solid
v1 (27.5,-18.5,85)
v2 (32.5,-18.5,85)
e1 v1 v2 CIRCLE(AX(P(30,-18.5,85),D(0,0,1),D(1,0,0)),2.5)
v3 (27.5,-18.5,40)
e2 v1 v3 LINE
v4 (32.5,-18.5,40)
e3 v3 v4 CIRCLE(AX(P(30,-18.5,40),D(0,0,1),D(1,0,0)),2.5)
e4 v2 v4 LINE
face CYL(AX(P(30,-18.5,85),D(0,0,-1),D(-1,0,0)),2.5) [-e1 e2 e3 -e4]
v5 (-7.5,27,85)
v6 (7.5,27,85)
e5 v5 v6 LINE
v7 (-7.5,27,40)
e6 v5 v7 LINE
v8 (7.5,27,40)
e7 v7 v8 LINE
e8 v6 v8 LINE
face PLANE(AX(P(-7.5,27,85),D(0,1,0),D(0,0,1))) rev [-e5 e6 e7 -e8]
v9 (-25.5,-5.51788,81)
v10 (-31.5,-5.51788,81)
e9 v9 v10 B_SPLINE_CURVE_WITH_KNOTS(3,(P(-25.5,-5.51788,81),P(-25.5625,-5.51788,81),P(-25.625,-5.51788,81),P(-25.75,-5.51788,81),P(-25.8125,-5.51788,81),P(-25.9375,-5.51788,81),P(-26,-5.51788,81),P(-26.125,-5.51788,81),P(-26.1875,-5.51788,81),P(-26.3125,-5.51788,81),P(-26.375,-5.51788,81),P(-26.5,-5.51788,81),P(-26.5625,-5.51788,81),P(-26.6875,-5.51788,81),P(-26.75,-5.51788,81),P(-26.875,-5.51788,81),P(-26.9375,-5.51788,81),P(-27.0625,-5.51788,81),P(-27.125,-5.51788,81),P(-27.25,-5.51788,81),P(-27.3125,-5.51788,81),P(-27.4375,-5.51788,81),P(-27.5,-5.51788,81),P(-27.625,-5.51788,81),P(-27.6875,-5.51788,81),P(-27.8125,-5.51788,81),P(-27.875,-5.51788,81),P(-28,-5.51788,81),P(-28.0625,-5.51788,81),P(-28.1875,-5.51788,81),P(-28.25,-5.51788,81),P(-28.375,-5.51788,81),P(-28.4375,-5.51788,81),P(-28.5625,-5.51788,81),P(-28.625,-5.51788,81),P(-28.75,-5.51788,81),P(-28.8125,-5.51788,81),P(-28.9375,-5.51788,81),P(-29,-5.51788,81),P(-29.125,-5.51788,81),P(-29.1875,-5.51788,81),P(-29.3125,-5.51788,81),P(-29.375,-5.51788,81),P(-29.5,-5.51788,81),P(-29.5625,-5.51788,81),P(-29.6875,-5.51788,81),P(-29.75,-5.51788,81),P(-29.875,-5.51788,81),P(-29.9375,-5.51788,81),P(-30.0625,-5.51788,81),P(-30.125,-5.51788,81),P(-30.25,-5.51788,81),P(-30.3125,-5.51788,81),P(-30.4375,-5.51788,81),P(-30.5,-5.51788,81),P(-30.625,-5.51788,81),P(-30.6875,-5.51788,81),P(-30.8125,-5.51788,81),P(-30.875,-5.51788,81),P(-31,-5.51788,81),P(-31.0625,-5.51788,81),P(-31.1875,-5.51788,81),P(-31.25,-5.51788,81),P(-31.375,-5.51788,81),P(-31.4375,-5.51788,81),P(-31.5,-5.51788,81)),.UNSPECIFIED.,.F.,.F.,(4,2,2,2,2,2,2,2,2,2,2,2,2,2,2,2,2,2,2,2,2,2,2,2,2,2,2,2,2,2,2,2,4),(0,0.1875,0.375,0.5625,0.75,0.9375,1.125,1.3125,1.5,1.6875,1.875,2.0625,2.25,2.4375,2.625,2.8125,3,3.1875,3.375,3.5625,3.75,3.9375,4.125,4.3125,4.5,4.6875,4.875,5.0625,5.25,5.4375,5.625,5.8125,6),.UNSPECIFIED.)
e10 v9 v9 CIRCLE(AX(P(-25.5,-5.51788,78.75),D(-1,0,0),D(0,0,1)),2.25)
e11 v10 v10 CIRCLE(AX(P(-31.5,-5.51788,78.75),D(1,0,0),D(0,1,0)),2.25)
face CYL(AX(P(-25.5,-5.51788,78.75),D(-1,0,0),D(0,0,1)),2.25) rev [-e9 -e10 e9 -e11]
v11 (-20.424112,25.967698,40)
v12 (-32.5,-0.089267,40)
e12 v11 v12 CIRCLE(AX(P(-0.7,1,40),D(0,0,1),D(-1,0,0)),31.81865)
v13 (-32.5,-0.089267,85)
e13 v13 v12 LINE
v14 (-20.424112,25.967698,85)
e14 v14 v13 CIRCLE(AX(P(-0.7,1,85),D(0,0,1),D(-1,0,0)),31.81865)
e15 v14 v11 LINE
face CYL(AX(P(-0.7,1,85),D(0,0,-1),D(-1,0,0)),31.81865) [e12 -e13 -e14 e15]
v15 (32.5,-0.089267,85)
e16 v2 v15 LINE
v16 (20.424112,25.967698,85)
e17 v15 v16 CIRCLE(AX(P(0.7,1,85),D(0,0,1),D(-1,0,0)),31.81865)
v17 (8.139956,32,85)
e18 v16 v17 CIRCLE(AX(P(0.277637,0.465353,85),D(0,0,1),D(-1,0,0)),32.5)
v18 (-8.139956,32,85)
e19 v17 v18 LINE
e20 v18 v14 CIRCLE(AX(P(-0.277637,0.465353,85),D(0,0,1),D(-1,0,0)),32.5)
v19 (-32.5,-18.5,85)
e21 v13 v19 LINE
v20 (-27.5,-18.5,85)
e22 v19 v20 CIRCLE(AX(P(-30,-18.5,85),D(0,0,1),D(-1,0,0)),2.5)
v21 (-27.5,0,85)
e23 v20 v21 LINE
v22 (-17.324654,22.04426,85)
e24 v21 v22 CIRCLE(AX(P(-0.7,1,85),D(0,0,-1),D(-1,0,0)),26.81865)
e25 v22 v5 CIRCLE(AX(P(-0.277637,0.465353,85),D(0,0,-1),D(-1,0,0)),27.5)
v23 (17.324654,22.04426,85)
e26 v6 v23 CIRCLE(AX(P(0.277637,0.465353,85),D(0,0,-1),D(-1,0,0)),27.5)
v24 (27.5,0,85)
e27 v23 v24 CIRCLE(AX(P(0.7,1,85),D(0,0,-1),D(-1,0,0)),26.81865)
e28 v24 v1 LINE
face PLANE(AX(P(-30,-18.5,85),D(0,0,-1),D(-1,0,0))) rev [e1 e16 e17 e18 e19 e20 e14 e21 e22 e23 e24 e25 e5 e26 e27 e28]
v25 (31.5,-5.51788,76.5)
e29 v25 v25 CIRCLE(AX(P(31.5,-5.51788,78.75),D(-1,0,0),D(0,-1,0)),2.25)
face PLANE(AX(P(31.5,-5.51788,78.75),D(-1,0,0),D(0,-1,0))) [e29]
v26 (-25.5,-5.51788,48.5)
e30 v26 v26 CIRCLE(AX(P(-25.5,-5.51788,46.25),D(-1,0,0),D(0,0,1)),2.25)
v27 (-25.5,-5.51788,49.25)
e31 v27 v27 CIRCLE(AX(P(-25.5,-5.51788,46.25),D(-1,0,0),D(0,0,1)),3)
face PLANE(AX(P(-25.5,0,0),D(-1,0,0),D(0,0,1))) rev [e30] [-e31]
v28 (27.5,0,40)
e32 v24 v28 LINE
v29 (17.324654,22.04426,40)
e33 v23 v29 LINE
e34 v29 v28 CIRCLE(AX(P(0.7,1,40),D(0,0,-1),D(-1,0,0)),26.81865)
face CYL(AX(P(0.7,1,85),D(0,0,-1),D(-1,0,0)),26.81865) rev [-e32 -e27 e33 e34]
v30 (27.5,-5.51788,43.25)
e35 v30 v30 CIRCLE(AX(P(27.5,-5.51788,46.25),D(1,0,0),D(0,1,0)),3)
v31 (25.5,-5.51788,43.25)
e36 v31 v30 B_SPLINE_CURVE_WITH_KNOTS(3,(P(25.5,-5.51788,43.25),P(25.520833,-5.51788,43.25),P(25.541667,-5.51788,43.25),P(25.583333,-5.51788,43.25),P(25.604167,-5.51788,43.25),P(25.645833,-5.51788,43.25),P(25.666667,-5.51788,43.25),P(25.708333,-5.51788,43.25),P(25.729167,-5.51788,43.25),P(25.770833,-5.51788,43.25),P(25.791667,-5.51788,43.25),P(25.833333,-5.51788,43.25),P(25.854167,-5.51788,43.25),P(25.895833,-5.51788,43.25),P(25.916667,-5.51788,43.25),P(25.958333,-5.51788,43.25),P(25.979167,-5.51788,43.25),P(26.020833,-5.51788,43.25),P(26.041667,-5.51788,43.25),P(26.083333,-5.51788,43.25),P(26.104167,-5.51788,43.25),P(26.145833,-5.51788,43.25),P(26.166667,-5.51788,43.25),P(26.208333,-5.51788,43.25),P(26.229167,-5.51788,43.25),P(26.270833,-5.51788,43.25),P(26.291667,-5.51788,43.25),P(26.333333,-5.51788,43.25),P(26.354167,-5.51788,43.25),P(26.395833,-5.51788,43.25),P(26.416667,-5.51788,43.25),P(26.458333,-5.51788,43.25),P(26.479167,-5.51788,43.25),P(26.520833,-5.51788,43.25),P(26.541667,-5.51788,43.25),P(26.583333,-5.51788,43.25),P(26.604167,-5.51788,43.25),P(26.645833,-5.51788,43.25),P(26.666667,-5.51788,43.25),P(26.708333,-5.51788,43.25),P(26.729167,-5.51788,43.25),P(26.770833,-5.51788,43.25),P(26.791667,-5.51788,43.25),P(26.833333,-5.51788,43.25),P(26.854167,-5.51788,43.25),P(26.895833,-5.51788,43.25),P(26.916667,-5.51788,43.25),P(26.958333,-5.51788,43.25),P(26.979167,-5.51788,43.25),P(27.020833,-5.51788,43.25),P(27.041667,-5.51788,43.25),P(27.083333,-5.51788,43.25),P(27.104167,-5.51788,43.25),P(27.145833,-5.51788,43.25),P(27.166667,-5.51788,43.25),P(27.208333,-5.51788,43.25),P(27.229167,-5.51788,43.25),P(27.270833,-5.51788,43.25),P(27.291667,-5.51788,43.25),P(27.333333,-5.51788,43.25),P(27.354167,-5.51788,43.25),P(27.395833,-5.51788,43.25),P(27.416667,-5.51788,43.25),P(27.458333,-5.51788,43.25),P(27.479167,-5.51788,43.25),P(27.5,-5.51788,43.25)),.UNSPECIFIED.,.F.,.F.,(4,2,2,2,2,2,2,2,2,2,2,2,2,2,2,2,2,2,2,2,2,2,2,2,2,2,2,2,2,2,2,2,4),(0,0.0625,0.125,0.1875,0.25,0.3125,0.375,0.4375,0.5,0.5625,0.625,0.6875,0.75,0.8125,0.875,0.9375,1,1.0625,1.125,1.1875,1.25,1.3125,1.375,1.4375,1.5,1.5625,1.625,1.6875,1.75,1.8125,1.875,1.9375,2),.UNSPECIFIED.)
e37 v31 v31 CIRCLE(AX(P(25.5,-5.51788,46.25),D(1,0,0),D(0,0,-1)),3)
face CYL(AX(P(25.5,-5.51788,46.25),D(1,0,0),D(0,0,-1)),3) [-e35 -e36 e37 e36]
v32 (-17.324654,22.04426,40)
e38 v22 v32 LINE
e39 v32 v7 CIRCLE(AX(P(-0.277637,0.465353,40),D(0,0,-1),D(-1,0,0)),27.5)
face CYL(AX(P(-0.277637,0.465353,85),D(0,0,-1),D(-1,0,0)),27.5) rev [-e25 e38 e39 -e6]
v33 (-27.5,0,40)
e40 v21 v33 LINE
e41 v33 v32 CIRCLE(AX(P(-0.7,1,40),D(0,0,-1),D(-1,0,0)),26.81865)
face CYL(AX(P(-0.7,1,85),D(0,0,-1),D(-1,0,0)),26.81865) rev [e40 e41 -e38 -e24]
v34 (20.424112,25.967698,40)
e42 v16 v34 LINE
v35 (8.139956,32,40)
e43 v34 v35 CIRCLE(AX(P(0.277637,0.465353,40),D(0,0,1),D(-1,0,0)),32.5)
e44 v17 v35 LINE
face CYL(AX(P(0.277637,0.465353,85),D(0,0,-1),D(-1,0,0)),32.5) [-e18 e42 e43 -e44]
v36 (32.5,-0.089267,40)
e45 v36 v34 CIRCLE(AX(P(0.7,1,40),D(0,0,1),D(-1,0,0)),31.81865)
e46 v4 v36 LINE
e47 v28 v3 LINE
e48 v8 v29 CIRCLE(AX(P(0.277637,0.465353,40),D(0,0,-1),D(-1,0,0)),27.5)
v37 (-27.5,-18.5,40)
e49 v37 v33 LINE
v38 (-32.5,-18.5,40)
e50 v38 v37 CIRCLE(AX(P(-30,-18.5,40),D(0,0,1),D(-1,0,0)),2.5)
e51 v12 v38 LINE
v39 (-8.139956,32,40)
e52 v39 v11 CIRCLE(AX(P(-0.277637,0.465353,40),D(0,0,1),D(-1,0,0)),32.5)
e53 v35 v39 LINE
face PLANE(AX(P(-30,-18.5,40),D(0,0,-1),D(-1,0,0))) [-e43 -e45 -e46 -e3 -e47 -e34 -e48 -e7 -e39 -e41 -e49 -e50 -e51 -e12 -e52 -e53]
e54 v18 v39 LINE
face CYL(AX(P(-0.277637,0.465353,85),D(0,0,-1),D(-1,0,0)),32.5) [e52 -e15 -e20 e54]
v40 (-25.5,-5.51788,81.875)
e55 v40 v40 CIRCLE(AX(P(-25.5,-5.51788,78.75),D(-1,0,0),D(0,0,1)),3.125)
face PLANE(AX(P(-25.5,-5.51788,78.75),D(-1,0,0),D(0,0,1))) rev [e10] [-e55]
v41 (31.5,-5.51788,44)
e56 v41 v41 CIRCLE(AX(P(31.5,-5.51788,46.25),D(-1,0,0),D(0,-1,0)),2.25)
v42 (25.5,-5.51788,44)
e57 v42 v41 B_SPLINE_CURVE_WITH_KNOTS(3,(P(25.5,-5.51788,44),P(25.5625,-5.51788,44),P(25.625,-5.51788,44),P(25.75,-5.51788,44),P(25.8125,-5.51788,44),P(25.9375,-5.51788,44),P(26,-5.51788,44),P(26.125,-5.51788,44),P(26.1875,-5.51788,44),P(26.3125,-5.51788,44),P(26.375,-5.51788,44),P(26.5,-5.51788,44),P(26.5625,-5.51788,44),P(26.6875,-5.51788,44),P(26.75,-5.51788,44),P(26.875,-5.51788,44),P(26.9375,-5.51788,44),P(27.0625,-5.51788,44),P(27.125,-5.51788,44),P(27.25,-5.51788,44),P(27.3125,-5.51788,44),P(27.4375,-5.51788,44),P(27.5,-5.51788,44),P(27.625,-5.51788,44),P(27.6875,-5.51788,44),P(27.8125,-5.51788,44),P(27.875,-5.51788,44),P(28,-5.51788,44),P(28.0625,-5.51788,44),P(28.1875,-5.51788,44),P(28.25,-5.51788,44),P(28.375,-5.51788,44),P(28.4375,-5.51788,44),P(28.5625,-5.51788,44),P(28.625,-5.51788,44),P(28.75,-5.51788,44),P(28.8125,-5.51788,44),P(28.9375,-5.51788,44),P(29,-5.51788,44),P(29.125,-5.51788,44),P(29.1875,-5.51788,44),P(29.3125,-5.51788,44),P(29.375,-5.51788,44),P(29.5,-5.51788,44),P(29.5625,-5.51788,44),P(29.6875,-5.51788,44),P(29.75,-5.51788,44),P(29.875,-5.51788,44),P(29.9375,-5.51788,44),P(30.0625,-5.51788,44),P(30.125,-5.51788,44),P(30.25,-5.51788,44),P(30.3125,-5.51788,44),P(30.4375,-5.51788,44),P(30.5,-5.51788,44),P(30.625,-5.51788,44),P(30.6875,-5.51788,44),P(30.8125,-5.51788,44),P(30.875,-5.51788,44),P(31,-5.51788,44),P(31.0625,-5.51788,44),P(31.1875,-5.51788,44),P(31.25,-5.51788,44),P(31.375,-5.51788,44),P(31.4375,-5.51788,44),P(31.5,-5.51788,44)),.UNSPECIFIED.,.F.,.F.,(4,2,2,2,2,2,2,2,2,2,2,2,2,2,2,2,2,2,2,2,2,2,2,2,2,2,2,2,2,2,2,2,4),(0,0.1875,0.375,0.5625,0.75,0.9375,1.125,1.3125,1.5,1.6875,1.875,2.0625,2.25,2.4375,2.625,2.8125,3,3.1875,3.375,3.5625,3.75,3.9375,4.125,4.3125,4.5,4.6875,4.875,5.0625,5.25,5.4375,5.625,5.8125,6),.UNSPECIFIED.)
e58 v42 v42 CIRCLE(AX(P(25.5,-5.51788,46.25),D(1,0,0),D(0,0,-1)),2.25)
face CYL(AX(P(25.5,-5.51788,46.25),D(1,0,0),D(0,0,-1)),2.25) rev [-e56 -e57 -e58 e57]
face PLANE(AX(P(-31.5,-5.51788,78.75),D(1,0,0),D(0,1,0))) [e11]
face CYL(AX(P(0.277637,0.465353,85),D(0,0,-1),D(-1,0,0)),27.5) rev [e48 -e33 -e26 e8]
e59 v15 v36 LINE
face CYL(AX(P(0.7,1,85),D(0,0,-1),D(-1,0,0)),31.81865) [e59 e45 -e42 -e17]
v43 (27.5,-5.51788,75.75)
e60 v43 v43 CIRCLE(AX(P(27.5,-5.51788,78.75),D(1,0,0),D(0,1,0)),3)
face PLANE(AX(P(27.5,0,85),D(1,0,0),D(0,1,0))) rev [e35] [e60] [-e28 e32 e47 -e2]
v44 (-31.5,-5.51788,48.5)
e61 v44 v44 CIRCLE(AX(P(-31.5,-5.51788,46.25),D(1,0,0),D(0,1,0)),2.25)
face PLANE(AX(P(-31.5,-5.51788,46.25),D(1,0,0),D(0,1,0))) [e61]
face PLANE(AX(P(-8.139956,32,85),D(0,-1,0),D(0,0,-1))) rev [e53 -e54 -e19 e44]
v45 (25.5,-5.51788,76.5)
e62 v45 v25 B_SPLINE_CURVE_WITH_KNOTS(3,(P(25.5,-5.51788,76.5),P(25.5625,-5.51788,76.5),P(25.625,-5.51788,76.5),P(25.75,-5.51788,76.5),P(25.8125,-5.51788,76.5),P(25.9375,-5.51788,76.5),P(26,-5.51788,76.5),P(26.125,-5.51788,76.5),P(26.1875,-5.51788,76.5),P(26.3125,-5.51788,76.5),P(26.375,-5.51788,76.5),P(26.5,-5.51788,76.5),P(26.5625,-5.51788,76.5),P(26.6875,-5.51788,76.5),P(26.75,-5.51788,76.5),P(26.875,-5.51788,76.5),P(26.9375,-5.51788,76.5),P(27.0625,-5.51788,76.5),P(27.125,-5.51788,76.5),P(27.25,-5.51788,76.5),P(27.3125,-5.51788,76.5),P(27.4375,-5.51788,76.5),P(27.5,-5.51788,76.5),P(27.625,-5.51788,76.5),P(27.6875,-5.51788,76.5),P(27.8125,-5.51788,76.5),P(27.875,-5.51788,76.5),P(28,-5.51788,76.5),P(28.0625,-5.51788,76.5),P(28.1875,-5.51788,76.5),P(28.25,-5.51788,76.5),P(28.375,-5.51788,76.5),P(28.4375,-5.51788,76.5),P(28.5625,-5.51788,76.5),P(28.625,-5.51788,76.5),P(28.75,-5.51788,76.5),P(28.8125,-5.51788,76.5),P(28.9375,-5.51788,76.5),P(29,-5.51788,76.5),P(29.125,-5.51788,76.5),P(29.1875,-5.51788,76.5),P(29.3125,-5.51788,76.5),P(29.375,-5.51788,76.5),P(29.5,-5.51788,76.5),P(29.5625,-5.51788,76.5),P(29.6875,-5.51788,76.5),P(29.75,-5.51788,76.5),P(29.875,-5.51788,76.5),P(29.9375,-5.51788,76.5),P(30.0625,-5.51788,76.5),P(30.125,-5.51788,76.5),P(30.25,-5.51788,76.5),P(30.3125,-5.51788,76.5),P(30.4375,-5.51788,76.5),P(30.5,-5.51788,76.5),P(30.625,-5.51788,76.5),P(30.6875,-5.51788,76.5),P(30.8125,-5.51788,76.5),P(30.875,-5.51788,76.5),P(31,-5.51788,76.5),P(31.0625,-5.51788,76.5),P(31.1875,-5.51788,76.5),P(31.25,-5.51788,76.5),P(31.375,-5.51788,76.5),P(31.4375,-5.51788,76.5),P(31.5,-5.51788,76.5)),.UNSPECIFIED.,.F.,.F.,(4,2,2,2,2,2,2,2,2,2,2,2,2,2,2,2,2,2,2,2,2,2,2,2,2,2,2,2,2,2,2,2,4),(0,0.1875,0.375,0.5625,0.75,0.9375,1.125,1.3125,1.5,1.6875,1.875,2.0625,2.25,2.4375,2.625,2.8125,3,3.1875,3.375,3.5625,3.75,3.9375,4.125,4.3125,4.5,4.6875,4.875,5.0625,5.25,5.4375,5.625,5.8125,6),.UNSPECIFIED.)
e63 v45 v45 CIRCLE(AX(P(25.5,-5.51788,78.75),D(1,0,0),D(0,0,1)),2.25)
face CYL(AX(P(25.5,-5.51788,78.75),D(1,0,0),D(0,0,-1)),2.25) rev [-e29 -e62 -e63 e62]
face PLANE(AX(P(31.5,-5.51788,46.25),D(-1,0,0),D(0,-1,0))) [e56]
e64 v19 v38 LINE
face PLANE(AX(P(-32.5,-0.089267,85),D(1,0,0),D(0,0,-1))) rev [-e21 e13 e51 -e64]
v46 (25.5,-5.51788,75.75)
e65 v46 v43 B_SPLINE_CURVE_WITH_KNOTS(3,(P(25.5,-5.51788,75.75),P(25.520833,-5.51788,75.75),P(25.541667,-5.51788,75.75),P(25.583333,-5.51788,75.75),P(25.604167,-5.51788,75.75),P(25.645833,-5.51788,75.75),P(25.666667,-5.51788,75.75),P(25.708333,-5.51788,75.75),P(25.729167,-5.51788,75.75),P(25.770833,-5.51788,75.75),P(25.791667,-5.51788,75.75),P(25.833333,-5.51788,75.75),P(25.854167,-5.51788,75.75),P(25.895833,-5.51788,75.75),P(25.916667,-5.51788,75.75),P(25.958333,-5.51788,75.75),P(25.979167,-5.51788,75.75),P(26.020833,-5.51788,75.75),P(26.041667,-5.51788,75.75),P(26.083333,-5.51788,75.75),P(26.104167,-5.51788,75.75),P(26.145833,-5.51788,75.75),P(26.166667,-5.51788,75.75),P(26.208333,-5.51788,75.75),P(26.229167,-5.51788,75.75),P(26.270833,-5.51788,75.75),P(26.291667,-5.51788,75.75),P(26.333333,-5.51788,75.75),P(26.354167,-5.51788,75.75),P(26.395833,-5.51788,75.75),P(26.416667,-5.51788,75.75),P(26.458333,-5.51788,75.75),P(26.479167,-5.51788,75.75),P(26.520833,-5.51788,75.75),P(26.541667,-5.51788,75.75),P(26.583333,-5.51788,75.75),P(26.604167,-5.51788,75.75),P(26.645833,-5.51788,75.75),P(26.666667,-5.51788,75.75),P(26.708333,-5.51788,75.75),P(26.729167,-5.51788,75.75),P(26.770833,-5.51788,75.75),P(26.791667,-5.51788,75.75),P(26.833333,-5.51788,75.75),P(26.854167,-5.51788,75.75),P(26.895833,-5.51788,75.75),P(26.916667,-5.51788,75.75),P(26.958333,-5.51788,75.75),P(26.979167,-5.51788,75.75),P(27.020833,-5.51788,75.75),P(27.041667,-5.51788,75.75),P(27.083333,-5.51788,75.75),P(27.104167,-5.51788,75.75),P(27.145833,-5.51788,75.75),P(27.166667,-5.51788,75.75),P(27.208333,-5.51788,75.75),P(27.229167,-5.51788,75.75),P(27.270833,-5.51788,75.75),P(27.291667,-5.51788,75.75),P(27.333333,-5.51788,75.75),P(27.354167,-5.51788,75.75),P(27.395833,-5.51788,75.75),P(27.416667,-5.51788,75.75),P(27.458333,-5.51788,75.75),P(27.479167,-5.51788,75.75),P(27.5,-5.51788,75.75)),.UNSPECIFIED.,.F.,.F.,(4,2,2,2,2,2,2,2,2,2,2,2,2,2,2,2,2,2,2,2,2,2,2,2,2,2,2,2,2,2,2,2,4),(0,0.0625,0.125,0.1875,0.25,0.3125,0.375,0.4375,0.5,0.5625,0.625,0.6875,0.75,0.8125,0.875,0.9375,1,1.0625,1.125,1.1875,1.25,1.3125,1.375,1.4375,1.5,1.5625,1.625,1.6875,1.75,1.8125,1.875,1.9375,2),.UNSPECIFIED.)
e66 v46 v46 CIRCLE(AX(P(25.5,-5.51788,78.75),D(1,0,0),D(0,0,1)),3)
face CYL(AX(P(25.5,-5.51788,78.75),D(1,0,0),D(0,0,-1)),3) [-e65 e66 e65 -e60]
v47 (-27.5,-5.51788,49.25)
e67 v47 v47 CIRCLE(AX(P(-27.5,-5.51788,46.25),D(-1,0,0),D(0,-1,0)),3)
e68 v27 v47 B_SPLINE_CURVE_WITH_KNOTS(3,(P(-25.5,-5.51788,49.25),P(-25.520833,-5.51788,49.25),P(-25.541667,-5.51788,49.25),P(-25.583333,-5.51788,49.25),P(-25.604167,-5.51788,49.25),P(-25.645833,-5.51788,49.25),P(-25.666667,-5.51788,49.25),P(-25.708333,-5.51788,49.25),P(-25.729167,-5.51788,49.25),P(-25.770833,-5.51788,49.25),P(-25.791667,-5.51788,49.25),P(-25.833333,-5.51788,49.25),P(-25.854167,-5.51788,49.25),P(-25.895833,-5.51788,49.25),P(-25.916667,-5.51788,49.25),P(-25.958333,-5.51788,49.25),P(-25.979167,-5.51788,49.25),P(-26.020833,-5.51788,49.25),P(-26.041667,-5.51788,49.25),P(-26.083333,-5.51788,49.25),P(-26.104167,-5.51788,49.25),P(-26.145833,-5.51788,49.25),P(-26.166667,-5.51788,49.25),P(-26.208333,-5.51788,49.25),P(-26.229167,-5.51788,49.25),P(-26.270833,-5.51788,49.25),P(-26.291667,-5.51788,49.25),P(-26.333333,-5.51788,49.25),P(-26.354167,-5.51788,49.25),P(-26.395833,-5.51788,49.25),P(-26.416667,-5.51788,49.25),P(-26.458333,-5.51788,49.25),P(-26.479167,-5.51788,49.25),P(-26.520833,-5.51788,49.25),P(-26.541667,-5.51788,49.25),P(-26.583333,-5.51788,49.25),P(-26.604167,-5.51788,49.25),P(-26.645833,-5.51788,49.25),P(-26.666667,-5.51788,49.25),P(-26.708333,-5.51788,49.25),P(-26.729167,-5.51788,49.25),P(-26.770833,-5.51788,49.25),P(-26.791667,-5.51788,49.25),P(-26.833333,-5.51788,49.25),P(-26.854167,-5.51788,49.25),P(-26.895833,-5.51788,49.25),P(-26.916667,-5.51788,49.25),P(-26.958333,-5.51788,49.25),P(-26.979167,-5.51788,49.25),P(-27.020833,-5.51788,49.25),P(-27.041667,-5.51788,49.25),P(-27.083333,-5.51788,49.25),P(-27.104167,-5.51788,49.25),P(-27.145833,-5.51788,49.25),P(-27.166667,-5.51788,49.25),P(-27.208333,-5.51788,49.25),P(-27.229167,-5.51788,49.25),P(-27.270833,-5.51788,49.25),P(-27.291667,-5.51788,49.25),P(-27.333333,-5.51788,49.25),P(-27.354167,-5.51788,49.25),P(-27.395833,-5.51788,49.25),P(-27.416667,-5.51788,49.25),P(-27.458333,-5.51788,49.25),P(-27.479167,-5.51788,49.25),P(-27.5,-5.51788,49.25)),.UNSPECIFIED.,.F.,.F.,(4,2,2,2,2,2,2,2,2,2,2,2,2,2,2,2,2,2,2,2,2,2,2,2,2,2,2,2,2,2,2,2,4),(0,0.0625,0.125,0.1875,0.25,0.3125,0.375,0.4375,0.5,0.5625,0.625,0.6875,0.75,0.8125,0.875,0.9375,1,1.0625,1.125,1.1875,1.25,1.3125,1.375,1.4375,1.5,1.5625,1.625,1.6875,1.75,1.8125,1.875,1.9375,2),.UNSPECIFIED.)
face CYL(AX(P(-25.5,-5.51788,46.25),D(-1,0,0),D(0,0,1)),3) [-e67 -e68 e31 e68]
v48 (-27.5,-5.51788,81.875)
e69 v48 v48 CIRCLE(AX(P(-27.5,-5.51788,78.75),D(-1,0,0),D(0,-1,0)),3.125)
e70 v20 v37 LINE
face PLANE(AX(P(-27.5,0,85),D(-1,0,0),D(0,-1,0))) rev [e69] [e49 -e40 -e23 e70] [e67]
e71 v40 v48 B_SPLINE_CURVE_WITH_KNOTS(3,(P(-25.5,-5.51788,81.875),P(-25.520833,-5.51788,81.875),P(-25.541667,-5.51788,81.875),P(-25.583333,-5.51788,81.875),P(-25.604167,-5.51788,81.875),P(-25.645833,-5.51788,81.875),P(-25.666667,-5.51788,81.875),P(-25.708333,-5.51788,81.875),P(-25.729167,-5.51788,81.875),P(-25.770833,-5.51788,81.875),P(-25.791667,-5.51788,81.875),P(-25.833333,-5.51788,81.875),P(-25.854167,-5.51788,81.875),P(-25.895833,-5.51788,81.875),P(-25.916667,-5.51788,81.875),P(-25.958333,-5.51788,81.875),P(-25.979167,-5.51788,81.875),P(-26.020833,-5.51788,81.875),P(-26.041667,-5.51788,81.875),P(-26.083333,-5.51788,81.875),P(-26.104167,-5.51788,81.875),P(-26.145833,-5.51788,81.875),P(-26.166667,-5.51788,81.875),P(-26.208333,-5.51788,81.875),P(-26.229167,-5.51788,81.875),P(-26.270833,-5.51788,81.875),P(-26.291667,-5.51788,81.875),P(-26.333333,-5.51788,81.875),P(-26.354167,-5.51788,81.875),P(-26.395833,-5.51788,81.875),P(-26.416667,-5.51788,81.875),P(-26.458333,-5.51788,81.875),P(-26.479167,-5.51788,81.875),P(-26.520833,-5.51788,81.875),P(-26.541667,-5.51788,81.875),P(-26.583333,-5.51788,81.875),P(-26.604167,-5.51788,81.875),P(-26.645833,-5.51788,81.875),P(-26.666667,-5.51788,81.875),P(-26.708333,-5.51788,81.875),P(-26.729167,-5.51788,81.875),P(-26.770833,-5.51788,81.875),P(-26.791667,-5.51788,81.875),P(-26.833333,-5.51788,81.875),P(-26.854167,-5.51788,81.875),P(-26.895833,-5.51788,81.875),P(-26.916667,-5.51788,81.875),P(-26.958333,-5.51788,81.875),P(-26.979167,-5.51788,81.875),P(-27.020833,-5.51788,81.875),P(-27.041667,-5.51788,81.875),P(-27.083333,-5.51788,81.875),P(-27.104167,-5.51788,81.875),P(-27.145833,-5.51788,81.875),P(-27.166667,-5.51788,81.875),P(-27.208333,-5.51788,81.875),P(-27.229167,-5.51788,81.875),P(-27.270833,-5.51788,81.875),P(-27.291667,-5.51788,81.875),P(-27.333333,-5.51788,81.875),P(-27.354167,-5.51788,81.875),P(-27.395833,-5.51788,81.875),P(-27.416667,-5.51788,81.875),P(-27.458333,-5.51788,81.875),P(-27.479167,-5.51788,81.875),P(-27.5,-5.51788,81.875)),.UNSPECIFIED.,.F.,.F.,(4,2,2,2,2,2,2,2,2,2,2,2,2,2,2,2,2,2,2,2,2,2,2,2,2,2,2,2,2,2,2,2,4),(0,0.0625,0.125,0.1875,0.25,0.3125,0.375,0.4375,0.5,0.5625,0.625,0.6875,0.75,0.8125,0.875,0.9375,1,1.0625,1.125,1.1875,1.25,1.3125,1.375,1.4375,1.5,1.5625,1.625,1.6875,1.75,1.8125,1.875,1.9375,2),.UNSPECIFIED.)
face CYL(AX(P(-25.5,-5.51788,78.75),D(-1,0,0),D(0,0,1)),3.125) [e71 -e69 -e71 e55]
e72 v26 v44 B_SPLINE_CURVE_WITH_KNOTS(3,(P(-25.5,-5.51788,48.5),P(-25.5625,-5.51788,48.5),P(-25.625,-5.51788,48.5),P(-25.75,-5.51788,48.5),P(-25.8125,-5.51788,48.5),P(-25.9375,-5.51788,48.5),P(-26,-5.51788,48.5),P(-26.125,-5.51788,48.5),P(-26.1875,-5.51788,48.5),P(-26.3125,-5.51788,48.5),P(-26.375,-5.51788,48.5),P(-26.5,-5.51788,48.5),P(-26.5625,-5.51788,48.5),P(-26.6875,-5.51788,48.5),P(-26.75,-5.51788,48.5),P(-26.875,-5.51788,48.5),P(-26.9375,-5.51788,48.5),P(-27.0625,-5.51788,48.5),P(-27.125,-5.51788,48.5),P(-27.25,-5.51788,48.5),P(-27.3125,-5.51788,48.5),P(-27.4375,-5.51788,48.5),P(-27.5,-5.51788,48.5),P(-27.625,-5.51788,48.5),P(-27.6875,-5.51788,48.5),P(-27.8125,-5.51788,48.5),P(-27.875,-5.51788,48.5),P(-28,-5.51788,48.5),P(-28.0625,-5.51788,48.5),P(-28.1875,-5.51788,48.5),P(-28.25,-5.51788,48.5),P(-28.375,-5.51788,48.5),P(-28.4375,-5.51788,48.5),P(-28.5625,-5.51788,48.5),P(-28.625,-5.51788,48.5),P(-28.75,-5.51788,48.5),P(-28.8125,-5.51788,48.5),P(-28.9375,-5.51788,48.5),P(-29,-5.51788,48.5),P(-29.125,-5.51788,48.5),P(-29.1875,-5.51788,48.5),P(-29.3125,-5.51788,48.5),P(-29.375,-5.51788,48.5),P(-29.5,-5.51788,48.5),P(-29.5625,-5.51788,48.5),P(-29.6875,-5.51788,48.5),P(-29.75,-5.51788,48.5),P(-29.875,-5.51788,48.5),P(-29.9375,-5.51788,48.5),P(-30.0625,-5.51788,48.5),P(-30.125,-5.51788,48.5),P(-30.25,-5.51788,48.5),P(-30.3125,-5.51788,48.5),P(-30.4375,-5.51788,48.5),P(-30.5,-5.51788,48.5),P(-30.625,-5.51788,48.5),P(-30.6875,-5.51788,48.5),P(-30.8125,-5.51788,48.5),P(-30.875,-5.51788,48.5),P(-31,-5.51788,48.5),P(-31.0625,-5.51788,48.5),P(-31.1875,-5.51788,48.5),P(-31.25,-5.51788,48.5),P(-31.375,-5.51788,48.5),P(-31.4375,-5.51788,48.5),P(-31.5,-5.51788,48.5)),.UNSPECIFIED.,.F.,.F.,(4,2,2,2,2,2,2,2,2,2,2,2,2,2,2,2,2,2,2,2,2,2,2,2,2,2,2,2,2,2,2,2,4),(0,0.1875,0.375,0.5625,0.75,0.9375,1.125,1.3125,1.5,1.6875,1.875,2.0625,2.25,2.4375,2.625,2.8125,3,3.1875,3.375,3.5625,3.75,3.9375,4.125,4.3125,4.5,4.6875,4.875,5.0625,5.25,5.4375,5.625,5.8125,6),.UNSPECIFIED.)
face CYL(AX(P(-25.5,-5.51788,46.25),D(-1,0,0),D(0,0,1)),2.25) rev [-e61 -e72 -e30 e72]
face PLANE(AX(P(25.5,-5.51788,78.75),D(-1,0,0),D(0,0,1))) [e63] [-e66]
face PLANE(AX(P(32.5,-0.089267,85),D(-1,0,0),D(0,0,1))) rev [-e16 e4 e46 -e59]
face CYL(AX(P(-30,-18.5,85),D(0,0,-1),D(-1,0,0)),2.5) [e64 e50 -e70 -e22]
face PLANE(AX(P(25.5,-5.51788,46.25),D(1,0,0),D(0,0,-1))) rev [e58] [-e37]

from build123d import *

# Parameters (mm, degrees)
SKETCH1_W                           = 50
SKETCH1_H                           = 50
BOSS_EXTRUDE1_DEPTH                 = 60
CUT_EXTRUDE1_DEPTH                  = 60
CUT_EXTRUDE2_START                  = -60
CUT_EXTRUDE2_DEPTH                  = 60
SKETCH5_OUTSIDE_W                   = 70.548
SKETCH5_OUTSIDE_H                   = 70.548
CUT_EXTRUDE3_DEPTH                  = 10
CUT_EXTRUDE4_DEPTH                  = 10
FILLET1_R                           = 1
SKETCH7_R                           = 2
BOSS_EXTRUDE2_DEPTH                 = 2
BOSS_EXTRUDE3_START                 = 2
SKETCH8_R                           = 2
BOSS_EXTRUDE3_DEPTH                 = 2
SKETCH9_R                           = 2.25
CUT_EXTRUDE5_DEPTH                  = 2
CUT_EXTRUDE6_START                  = -2
SKETCH10_R                          = 2.25
CUT_EXTRUDE6_DEPTH                  = 2
FILLET2_R                           = 1
CUT_EXTRUDE7_REACH                  = 71.642
CUT_EXTRUDE7_END_RADIUS             = 25
CUT_EXTRUDE7_DIRECTION_2_REACH      = 71.642
CUT_EXTRUDE7_DIRECTION_2_END_RADIUS = 25
BOSS_EXTRUDE4_DEPTH                 = 35
BOSS_EXTRUDE4_DEPTH_BACK            = 10
SKETCH14_R                          = 2
BOSS_EXTRUDE5_DEPTH                 = 0.1
SKETCH15_R                          = 3
SKETCH15_R_2                        = 2.25
BOSS_EXTRUDE6_DEPTH                 = 7
SKETCH16_R                          = 2.25
CUT_EXTRUDE8_DEPTH                  = 2
SKETCH17_W                          = 10
SKETCH17_H                          = 10
CUT_EXTRUDE9_DEPTH                  = 29.758852585
SKETCH18_W                          = 10
SKETCH18_H                          = 14.003619208
CUT_EXTRUDE10_DEPTH                 = 31.758852585
SKETCH20_R                          = 3
SKETCH20_R_2                        = 2.25
BOSS_EXTRUDE8_DEPTH                 = 7
SKETCH21_R                          = 2.25
CUT_EXTRUDE11_DEPTH                 = 4
CUT_EXTRUDE12_DEPTH                 = 40
SKETCH23_R                          = 2.25
CUT_EXTRUDE13_DEPTH                 = 4
SKETCH24_R                          = 2.25
CUT_EXTRUDE14_DEPTH                 = 2
SKETCH25_R                          = 3.125
SKETCH25_R_2                        = 2.25
BOSS_EXTRUDE9_DEPTH                 = 7
SKETCH26_R                          = 2.25
CUT_EXTRUDE15_DEPTH                 = 4


# Read off the part's stored shape, not the designer's step: Cut-Extrude2
with BuildPart() as part:
    # Sketch1 → Boss-Extrude1 (new body)
    with BuildSketch(Plane.XY):
        Rectangle(SKETCH1_W, SKETCH1_H)
    extrude(amount=BOSS_EXTRUDE1_DEPTH)

    # Sketch3 → Cut-Extrude1 (cut)
    with BuildSketch(Plane.XY.offset(60)):
        with BuildLine():
            Line((-25, 25), (-25, 0))
            ThreePointArc((-25, 0), (-17.677669541, 17.677669518), (-3.2e-08, 25))
            Line((-3.2e-08, 25), (-25, 25))
        make_face()
        with BuildLine():
            Line((25, 25), (-3.2e-08, 25))
            ThreePointArc((-3.2e-08, 25), (17.677669518, 17.677669541), (25, 0))
            Line((25, 0), (25, 25))
        make_face()
    extrude(amount=-CUT_EXTRUDE1_DEPTH, mode=Mode.SUBTRACT)

    # Cut-Extrude2 outline → Cut-Extrude2 (cut)
    with BuildSketch(Plane.XY.offset(60).offset(CUT_EXTRUDE2_START)):
        with BuildLine():
            ThreePointArc((8.576916353, -23.025834486), (10.616475204, -9.420494413), (7.92577262, 4.071177033))
            ThreePointArc((7.92577262, 4.071177033), (0, 9.5), (-7.92577262, 4.071177033))
            ThreePointArc((-7.92577262, 4.071177033), (-10.616475204, -9.420494413), (-8.576916353, -23.025834486))
            ThreePointArc((-8.576916353, -23.025834486), (-8.783191003, -24.377140732), (-10, -25))
            Line((-10, -25), (10, -25))
            ThreePointArc((10, -25), (8.783191003, -24.377140732), (8.576916353, -23.025834486))
        make_face()
        with BuildLine():
            ThreePointArc((25, -11.035759956), (21.246950766, -20.57515197), (12, -25))
            Line((12, -25), (25, -25))
            Line((25, -25), (25, -11.035759956))
        make_face()
        with BuildLine():
            Line((-25, -25), (-12, -25))
            ThreePointArc((-12, -25), (-21.246950766, -20.57515197), (-25, -11.035759956))
            Line((-25, -11.035759956), (-25, -25))
        make_face()
    extrude(amount=CUT_EXTRUDE2_DEPTH, mode=Mode.SUBTRACT)

    # Sketch5 outside → Cut-Extrude3 (cut)
    with BuildSketch(Plane.XY.offset(60)):
        Rectangle(SKETCH5_OUTSIDE_W, SKETCH5_OUTSIDE_H)
        with BuildLine():
            Line((-7.92577262, 4.071177033), (-12.879426293, 4.071177033))
            Line((-12.879426293, 4.071177033), (-12.879426293, -5.928822967))
            Line((-12.879426293, -5.928822967), (-10.379426293, -5.928822967))
            ThreePointArc((-10.379426293, -5.928822967), (-9.475712618, -0.849542187), (-7.92577262, 4.071177033))
        make_face(mode=Mode.SUBTRACT)
        with BuildLine():
            Line((7.92577262, 4.071177033), (12.879426293, 4.071177033))
            Line((12.879426293, 4.071177033), (12.879426293, -5.928822967))
            Line((12.879426293, -5.928822967), (10.379426293, -5.928822967))
            ThreePointArc((10.379426293, -5.928822967), (9.475712618, -0.849542187), (7.92577262, 4.071177033))
        make_face(mode=Mode.SUBTRACT)
    extrude(amount=-CUT_EXTRUDE3_DEPTH, mode=Mode.SUBTRACT)

    # Sketch6 → Cut-Extrude4 (cut)
    # profile 1 of 4: a face of its own
    with BuildSketch(Plane(origin=(0, 0, 0), x_dir=(-1, 0, 0), z_dir=(0, 0, -1))):
        with BuildLine():
            Line((0, 9.5), (0, 25))
            ThreePointArc((0, 25), (-17.67766953, 17.67766953), (-25, 0))
            Line((-25, 0), (-25, -11.035759956))
            ThreePointArc((-25, -11.035759956), (-21.246950766, -20.57515197), (-12, -25))
            Line((-12, -25), (-10, -25))
            ThreePointArc((-10, -25), (-8.783191003, -24.377140732), (-8.576916353, -23.025834486))
            ThreePointArc((-8.576916353, -23.025834486), (-10.289550459, -15.574005024), (-10.552980025, -7.932442175))
            ThreePointArc((-10.552980025, -7.932442175), (-10.478797406, -6.929541656), (-10.379426293, -5.928822967))
            ThreePointArc((-10.379426293, -5.928822967), (-9.475712618, -0.849542187), (-7.92577262, 4.071177033))
            ThreePointArc((-7.92577262, 4.071177033), (-4.803383975, 8.012667281), (0, 9.5))
        make_face()
        with BuildLine():
            Line((-12.879426293, 6.071177033), (-12.879426293, 3.071177033))
            Line((-12.879426293, 3.071177033), (-12.879426293, -4.928822967))
            Line((-12.879426293, -4.928822967), (-12.879426293, -7.932442175))
            Line((-12.879426293, -7.932442175), (-14.879423018, -7.932442175))
            ThreePointArc((-14.879423018, -7.932442175), (-15.586532115, -7.639547997), (-15.879426293, -6.932438901))
            Line((-15.879426293, -6.932438901), (-15.879426293, 5.071173759))
            ThreePointArc((-15.879426293, 5.071173759), (-15.586532115, 5.778282855), (-14.879423018, 6.071177033))
            Line((-14.879423018, 6.071177033), (-12.879426293, 6.071177033))
        make_face(mode=Mode.SUBTRACT)
    # profile 2 of 4: a face of its own
    with BuildSketch(Plane(origin=(0, 0, 0), x_dir=(-1, 0, 0), z_dir=(0, 0, -1))):
        with BuildLine():
            ThreePointArc((25, 0), (17.67766953, 17.67766953), (0, 25))
            Line((0, 25), (0, 9.5))
            ThreePointArc((0, 9.5), (4.803383975, 8.012667281), (7.92577262, 4.071177033))
            ThreePointArc((7.92577262, 4.071177033), (10.616475204, -9.420494413), (8.576916353, -23.025834486))
            ThreePointArc((8.576916353, -23.025834486), (8.783191003, -24.377140732), (10, -25))
            Line((10, -25), (12, -25))
            ThreePointArc((12, -25), (21.246950766, -20.57515197), (25, -11.035759956))
            Line((25, -11.035759956), (25, 0))
        make_face()
        with BuildLine():
            Line((12.879426293, -4.928822967), (12.879426293, 3.071177033))
            Line((12.879426293, 3.071177033), (12.879426293, 6.071177033))
            Line((12.879426293, 6.071177033), (14.879423018, 6.071177033))
            ThreePointArc((14.879423018, 6.071177033), (15.586532115, 5.778282855), (15.879426293, 5.071173759))
            Line((15.879426293, 5.071173759), (15.879426293, -6.932438901))
            ThreePointArc((15.879426293, -6.932438901), (15.586532115, -7.639547997), (14.879423018, -7.932442175))
            Line((14.879423018, -7.932442175), (12.879426293, -7.932442175))
            Line((12.879426293, -7.932442175), (12.879426293, -4.928822967))
        make_face(mode=Mode.SUBTRACT)
    # profile 3 of 4: a face of its own
    with BuildSketch(Plane(origin=(0, 0, 0), x_dir=(-1, 0, 0), z_dir=(0, 0, -1))):
        with BuildLine():
            Line((0, 9.5), (0, 25))
            ThreePointArc((0, 25), (-17.67766953, 17.67766953), (-25, 0))
            Line((-25, 0), (-25, -11.035759956))
            ThreePointArc((-25, -11.035759956), (-21.246950766, -20.57515197), (-12, -25))
            Line((-12, -25), (-10, -25))
            ThreePointArc((-10, -25), (-8.783191003, -24.377140732), (-8.576916353, -23.025834486))
            ThreePointArc((-8.576916353, -23.025834486), (-10.289550459, -15.574005024), (-10.552980025, -7.932442175))
            ThreePointArc((-10.552980025, -7.932442175), (-10.478797406, -6.929541656), (-10.379426293, -5.928822967))
            ThreePointArc((-10.379426293, -5.928822967), (-9.475712618, -0.849542187), (-7.92577262, 4.071177033))
            ThreePointArc((-7.92577262, 4.071177033), (-4.803383975, 8.012667281), (0, 9.5))
        make_face()
        with BuildLine():
            Line((-12.879426293, 6.071177033), (-12.879426293, 3.071177033))
            Line((-12.879426293, 3.071177033), (-12.879426293, -4.928822967))
            Line((-12.879426293, -4.928822967), (-12.879426293, -7.932442175))
            Line((-12.879426293, -7.932442175), (-14.879423018, -7.932442175))
            ThreePointArc((-14.879423018, -7.932442175), (-15.586532115, -7.639547997), (-15.879426293, -6.932438901))
            Line((-15.879426293, -6.932438901), (-15.879426293, 5.071173759))
            ThreePointArc((-15.879426293, 5.071173759), (-15.586532115, 5.778282855), (-14.879423018, 6.071177033))
            Line((-14.879423018, 6.071177033), (-12.879426293, 6.071177033))
        make_face(mode=Mode.SUBTRACT)
    # profile 4 of 4: a face of its own
    with BuildSketch(Plane(origin=(0, 0, 0), x_dir=(-1, 0, 0), z_dir=(0, 0, -1))):
        with BuildLine():
            ThreePointArc((25, 0), (17.67766953, 17.67766953), (0, 25))
            Line((0, 25), (0, 9.5))
            ThreePointArc((0, 9.5), (4.803383975, 8.012667281), (7.92577262, 4.071177033))
            ThreePointArc((7.92577262, 4.071177033), (10.616475204, -9.420494413), (8.576916353, -23.025834486))
            ThreePointArc((8.576916353, -23.025834486), (8.783191003, -24.377140732), (10, -25))
            Line((10, -25), (12, -25))
            ThreePointArc((12, -25), (21.246950766, -20.57515197), (25, -11.035759956))
            Line((25, -11.035759956), (25, 0))
        make_face()
        with BuildLine():
            Line((12.879426293, -4.928822967), (12.879426293, 3.071177033))
            Line((12.879426293, 3.071177033), (12.879426293, 6.071177033))
            Line((12.879426293, 6.071177033), (14.879423018, 6.071177033))
            ThreePointArc((14.879423018, 6.071177033), (15.586532115, 5.778282855), (15.879426293, 5.071173759))
            Line((15.879426293, 5.071173759), (15.879426293, -6.932438901))
            ThreePointArc((15.879426293, -6.932438901), (15.586532115, -7.639547997), (14.879423018, -7.932442175))
            Line((14.879423018, -7.932442175), (12.879426293, -7.932442175))
            Line((12.879426293, -7.932442175), (12.879426293, -4.928822967))
        make_face(mode=Mode.SUBTRACT)
    extrude(amount=-CUT_EXTRUDE4_DEPTH, mode=Mode.SUBTRACT)

    # Fillet1
    fillet1_edges = [part.edges().sort_by_distance(p)[0] for p in [
        (12.879426293, 4.071177033, 55),
        (12.879426293, -5.928822967, 55),
        (-12.879426293, -5.928822967, 55),
        (-12.879426293, 4.071177033, 55),
    ]]
    fillet(fillet1_edges, radius=FILLET1_R)

    # Sketch7 → Boss-Extrude2 (add)
    with BuildSketch(Plane.ZY.offset(12.879426293)):
        with Locations(Location((55, -0.928822967, 0), (0, 0, 270))):
            Circle(SKETCH7_R)
    extrude(amount=BOSS_EXTRUDE2_DEPTH)

    # Sketch8 → Boss-Extrude3 (add)
    with BuildSketch(Plane(origin=(12.879426293, 0, 0), x_dir=(0, 0, -1), z_dir=(1, 0, 0)).offset(BOSS_EXTRUDE3_START)):
        with Locations(Location((-55, -0.928822967, 0), (0, 0, 270))):
            Circle(SKETCH8_R)
    extrude(amount=-BOSS_EXTRUDE3_DEPTH)

    # Sketch9 → Cut-Extrude5 (cut)
    with BuildSketch(Plane.ZY.offset(-12.879426293)):
        with Locations(Location((5, -0.930632571, 0), (0, 0, 270))):
            Circle(SKETCH9_R)
    extrude(amount=-CUT_EXTRUDE5_DEPTH, mode=Mode.SUBTRACT)

    # Sketch10 → Cut-Extrude6 (cut)
    with BuildSketch(Plane(origin=(-12.879426293, 0, 0), x_dir=(0, 0, -1), z_dir=(1, 0, 0)).offset(CUT_EXTRUDE6_START)):
        with Locations(Location((-5, -0.930632571, 0), (0, 0, 270))):
            Circle(SKETCH10_R)
    extrude(amount=CUT_EXTRUDE6_DEPTH, mode=Mode.SUBTRACT)

    # Fillet2
    fillet2_edges = [part.edges().sort_by_distance(p)[0] for p in [
        (-12.879426293, 6.071177033, 5),
        (-12.879426293, -7.932442175, 5),
        (12.879426293, -7.932442175, 5),
        (12.879426293, 6.071177033, 5),
    ]]
    fillet(fillet2_edges, radius=FILLET2_R)

    # Cut-Extrude7: up to this cylinder (the profile starts inside it)
    cut_extrude7_end = Plane(origin=(0, 0, 27.7442175), z_dir=(0, 0, 1)) * Cylinder(CUT_EXTRUDE7_END_RADIUS, 227.198087, mode=Mode.PRIVATE)
    # Sketch11 → Cut-Extrude7 (cut, up to the surface)
    with BuildSketch(Plane(origin=(0, 0, 0), x_dir=(0, 0, -1), z_dir=(1, 0, 0)), mode=Mode.PRIVATE) as cut_extrude7_sk1:
        with BuildLine():
            add(Edge.make_bspline(
                [(-50, 12.5), (-45.835040113, 20.240050977), (-37.917520056, 24.110076465), (-30, 24.110076465)],
                knots=[0, 0, 0, 0, 0.5, 0.5, 0.5, 0.5], degree=3))
            Line((-30, 24.110076465), (-30, 25))
            Line((-30, 25), (-50, 25))
            Line((-50, 25), (-50, 12.5))
        make_face()
    cut_extrude7_tool1 = extrude(cut_extrude7_sk1.sketch, amount=CUT_EXTRUDE7_REACH, mode=Mode.PRIVATE) & cut_extrude7_end
    add(cut_extrude7_tool1.solids().sort_by_distance((0, 21.671006, 44.201261))[0], mode=Mode.SUBTRACT)
    # Sketch11 → Cut-Extrude7 (cut, up to the surface)
    with BuildSketch(Plane(origin=(0, 0, 0), x_dir=(0, 0, -1), z_dir=(1, 0, 0)), mode=Mode.PRIVATE) as cut_extrude7_sk2:
        with BuildLine():
            add(Edge.make_bspline(
                [(-30, 24.110076465), (-22.082479944, 24.110076465), (-14.164959887, 20.240050977), (-10, 12.5)],
                knots=[0.5, 0.5, 0.5, 0.5, 1, 1, 1, 1], degree=3))
            ThreePointArc((-10, 12.5), (-11.128726859, 19.123824427), (-14.387505004, 25))
            Line((-14.387505004, 25), (-30, 25))
            Line((-30, 25), (-30, 24.110076465))
        make_face()
    cut_extrude7_tool2 = extrude(cut_extrude7_sk2.sketch, amount=CUT_EXTRUDE7_REACH, mode=Mode.PRIVATE) & cut_extrude7_end
    add(cut_extrude7_tool2.solids().sort_by_distance((0, 21.59828, 16.984521))[0], mode=Mode.SUBTRACT)
    # Sketch11 → Cut-Extrude7 (cut, up to the surface)
    with BuildSketch(Plane(origin=(0, 0, 0), x_dir=(0, 0, -1), z_dir=(1, 0, 0)), mode=Mode.PRIVATE) as cut_extrude7_sk3:
        with BuildLine():
            ThreePointArc((-14.387505004, 25), (-11.128726859, 19.123824427), (-10, 12.5))
            Line((-10, 12.5), (-10, 25))
            Line((-10, 25), (-14.387505004, 25))
        make_face()
    cut_extrude7_tool3 = extrude(cut_extrude7_sk3.sketch, amount=CUT_EXTRUDE7_REACH, mode=Mode.PRIVATE) & cut_extrude7_end
    add(cut_extrude7_tool3.solids().sort_by_distance((0, 21.947708, 11.287174))[0], mode=Mode.SUBTRACT)

    # Cut-Extrude7 direction 2: up to this cylinder (the profile starts inside it)
    cut_extrude7_direction_2_end = Plane(origin=(0, 0, 27.7442175), z_dir=(0, 0, 1)) * Cylinder(CUT_EXTRUDE7_DIRECTION_2_END_RADIUS, 227.198087, mode=Mode.PRIVATE)
    # Sketch11 → Cut-Extrude7 direction 2 (cut, up to the surface)
    with BuildSketch(Plane(origin=(0, 0, 0), x_dir=(0, 0, -1), z_dir=(1, 0, 0)), mode=Mode.PRIVATE) as cut_extrude7_direction_2_sk1:
        with BuildLine():
            add(Edge.make_bspline(
                [(-50, 12.5), (-45.835040113, 20.240050977), (-37.917520056, 24.110076465), (-30, 24.110076465)],
                knots=[0, 0, 0, 0, 0.5, 0.5, 0.5, 0.5], degree=3))
            Line((-30, 24.110076465), (-30, 25))
            Line((-30, 25), (-50, 25))
            Line((-50, 25), (-50, 12.5))
        make_face()
    cut_extrude7_direction_2_tool1 = extrude(cut_extrude7_direction_2_sk1.sketch, amount=-CUT_EXTRUDE7_DIRECTION_2_REACH, mode=Mode.PRIVATE) & cut_extrude7_direction_2_end
    add(cut_extrude7_direction_2_tool1.solids().sort_by_distance((0, 21.671006, 44.201261))[0], mode=Mode.SUBTRACT)
    # Sketch11 → Cut-Extrude7 direction 2 (cut, up to the surface)
    with BuildSketch(Plane(origin=(0, 0, 0), x_dir=(0, 0, -1), z_dir=(1, 0, 0)), mode=Mode.PRIVATE) as cut_extrude7_direction_2_sk2:
        with BuildLine():
            add(Edge.make_bspline(
                [(-30, 24.110076465), (-22.082479944, 24.110076465), (-14.164959887, 20.240050977), (-10, 12.5)],
                knots=[0.5, 0.5, 0.5, 0.5, 1, 1, 1, 1], degree=3))
            ThreePointArc((-10, 12.5), (-11.128726859, 19.123824427), (-14.387505004, 25))
            Line((-14.387505004, 25), (-30, 25))
            Line((-30, 25), (-30, 24.110076465))
        make_face()
    cut_extrude7_direction_2_tool2 = extrude(cut_extrude7_direction_2_sk2.sketch, amount=-CUT_EXTRUDE7_DIRECTION_2_REACH, mode=Mode.PRIVATE) & cut_extrude7_direction_2_end
    add(cut_extrude7_direction_2_tool2.solids().sort_by_distance((0, 21.59828, 16.984521))[0], mode=Mode.SUBTRACT)
    # Sketch11 → Cut-Extrude7 direction 2 (cut, up to the surface)
    with BuildSketch(Plane(origin=(0, 0, 0), x_dir=(0, 0, -1), z_dir=(1, 0, 0)), mode=Mode.PRIVATE) as cut_extrude7_direction_2_sk3:
        with BuildLine():
            ThreePointArc((-14.387505004, 25), (-11.128726859, 19.123824427), (-10, 12.5))
            Line((-10, 12.5), (-10, 25))
            Line((-10, 25), (-14.387505004, 25))
        make_face()
    cut_extrude7_direction_2_tool3 = extrude(cut_extrude7_direction_2_sk3.sketch, amount=-CUT_EXTRUDE7_DIRECTION_2_REACH, mode=Mode.PRIVATE) & cut_extrude7_direction_2_end
    add(cut_extrude7_direction_2_tool3.solids().sort_by_distance((0, 21.947708, 11.287174))[0], mode=Mode.SUBTRACT)

    # Sketch14 → Boss-Extrude5 (add)
    with BuildSketch(Plane.ZY.offset(25)):
        with Locations(Location((46.25, -5.517879978, 0), (0, 0, 180))):
            Circle(SKETCH14_R)
    extrude(amount=BOSS_EXTRUDE5_DEPTH)

    # Sketch17 → Cut-Extrude9 (cut)
    with BuildSketch(Plane.ZY.offset(14.879426293)):
        with Locations((55, -0.928822967)):
            Rectangle(SKETCH17_W, SKETCH17_H)
    extrude(amount=-CUT_EXTRUDE9_DEPTH, mode=Mode.SUBTRACT)

    # Sketch18 → Cut-Extrude10 (cut)
    with BuildSketch(Plane.ZY.offset(15.879426293)):
        with Locations((5, -0.930632571)):
            Rectangle(SKETCH18_W, SKETCH18_H)
    extrude(amount=-CUT_EXTRUDE10_DEPTH, mode=Mode.SUBTRACT)

    # Sketch22 → Cut-Extrude12 (cut)
    with BuildSketch(Plane(origin=(0, 0, 10), x_dir=(-1, 0, 0), z_dir=(0, 0, -1))):
        with BuildLine():
            ThreePointArc((13.927271842, 22.269557575), (22.703581778, 12.718484283), (25.250496515, 0))
            Line((25.250496515, 0), (25.250496515, -10.329981393))
            Line((25.250496515, -10.329981393), (25.250496515, -25.890161066))
            Line((25.250496515, -25.890161066), (-25, -25.890161066))
            Line((-25, -25.890161066), (-25, -11.035759956))
            ThreePointArc((-25, -11.035759956), (-21.246950766, -20.57515197), (-12, -25))
            Line((-12, -25), (-10, -25))
            ThreePointArc((-10, -25), (-8.783191003, -24.377140732), (-8.576916353, -23.025834486))
            ThreePointArc((-8.576916353, -23.025834486), (-10.616475204, -9.420494413), (-7.92577262, 4.071177033))
            ThreePointArc((-7.92577262, 4.071177033), (0, 9.5), (7.92577262, 4.071177033))
            ThreePointArc((7.92577262, 4.071177033), (10.616475204, -9.420494413), (8.576916353, -23.025834486))
            ThreePointArc((8.576916353, -23.025834486), (8.783191003, -24.377140732), (10, -25))
            Line((10, -25), (12, -25))
            ThreePointArc((12, -25), (21.246950766, -20.57515197), (25, -11.035759956))
            Line((25, -11.035759956), (25, 0))
            ThreePointArc((25, 0), (24.148145657, 6.470476128), (21.650635095, 12.5))
            Line((21.650635095, 12.5), (-21.650635095, 12.5))
            ThreePointArc((-21.650635095, 12.5), (-24.148145657, 6.470476128), (-25, 0))
            Line((-25, 0), (-25, 10.56531366))
            ThreePointArc((-25, 10.56531366), (-8.174232985, 25.190752437), (13.927271842, 22.269557575))
        make_face()
        with BuildLine():
            ThreePointArc((-10, -25), (-8.783191003, -24.377140732), (-8.576916353, -23.025834486))
            ThreePointArc((-8.576916353, -23.025834486), (-10.616475204, -9.420494413), (-7.92577262, 4.071177033))
            ThreePointArc((-7.92577262, 4.071177033), (0, 9.5), (7.92577262, 4.071177033))
            ThreePointArc((7.92577262, 4.071177033), (10.616475204, -9.420494413), (8.576916353, -23.025834486))
            ThreePointArc((8.576916353, -23.025834486), (8.783191003, -24.377140732), (10, -25))
            Line((10, -25), (12, -25))
            ThreePointArc((12, -25), (21.246950766, -20.57515197), (25, -11.035759956))
            Line((25, -11.035759956), (25, 0))
            ThreePointArc((25, 0), (24.148145657, 6.470476128), (21.650635095, 12.5))
            Line((21.650635095, 12.5), (-21.650635095, 12.5))
            ThreePointArc((-21.650635095, 12.5), (-24.148145657, 6.470476128), (-25, 0))
            Line((-25, 0), (-25, -11.035759956))
            ThreePointArc((-25, -11.035759956), (-21.246950766, -20.57515197), (-12, -25))
            Line((-12, -25), (-10, -25))
        make_face()
    extrude(amount=-CUT_EXTRUDE12_DEPTH, mode=Mode.SUBTRACT)


with BuildPart() as body_2:
    # Sketch13 → Boss-Extrude4 (new, two sides: drawn at the far end of the back side and taken through both)
    with BuildSketch(Plane.XY.offset(50).offset(-BOSS_EXTRUDE4_DEPTH_BACK)):
        with BuildLine():
            Line((-27.5, 0), (-27.5, -18.5))
            ThreePointArc((-27.5, -18.5), (-30, -21), (-32.5, -18.5))
            Line((-32.5, -18.5), (-32.5, -0.08926685))
            ThreePointArc((-32.5, -0.08926685), (-29.569098843, 14.379149235), (-20.424111586, 25.96769762))
            ThreePointArc((-20.424111586, 25.96769762), (-14.603149144, 29.637766733), (-8.139956045, 32))
            Line((-8.139956045, 32), (8.139956045, 32))
            ThreePointArc((8.139956045, 32), (14.603149144, 29.637766733), (20.424111586, 25.96769762))
            ThreePointArc((20.424111586, 25.96769762), (29.569098843, 14.379149235), (32.5, -0.08926685))
            Line((32.5, -0.08926685), (32.5, -18.5))
            ThreePointArc((32.5, -18.5), (30, -21), (27.5, -18.5))
            Line((27.5, -18.5), (27.5, 0))
            ThreePointArc((27.5, 0), (25.04979452, 12.239551007), (17.324653965, 22.044260038))
            ThreePointArc((17.324653965, 22.044260038), (12.662730485, 25.018549885), (7.5, 27))
            Line((7.5, 27), (-7.5, 27))
            ThreePointArc((-7.5, 27), (-12.662730485, 25.018549885), (-17.324653965, 22.044260038))
            ThreePointArc((-17.324653965, 22.044260038), (-25.04979452, 12.239551007), (-27.5, 0))
        make_face()
    extrude(amount=BOSS_EXTRUDE4_DEPTH + BOSS_EXTRUDE4_DEPTH_BACK)

    # Sketch15 → Boss-Extrude6 (add)
    with BuildSketch(Plane.ZY.offset(32.5)):
        with Locations((46.25, -5.517879978)):
            Circle(SKETCH15_R)
        with Locations((46.25, -5.517879978)):
            Circle(SKETCH15_R_2, mode=Mode.SUBTRACT)
    extrude(amount=-BOSS_EXTRUDE6_DEPTH)

    # Sketch16 → Cut-Extrude8 (cut)
    with BuildSketch(Plane(origin=(-27.5, 0, 0), x_dir=(0, 0, -1), z_dir=(1, 0, 0))):
        with Locations(Location((-46.25, -5.517879978, 0), (0, 0, 180))):
            Circle(SKETCH16_R)
    extrude(amount=-CUT_EXTRUDE8_DEPTH, mode=Mode.SUBTRACT)

    # Sketch20 → Boss-Extrude8 (add)
    # profile 1 of 2: a face of its own
    with BuildSketch(Plane(origin=(32.5, 0, 0), x_dir=(0, 0, -1), z_dir=(1, 0, 0))):
        with Locations(Location((-46.25, -5.517879978, 0), (0, 0, 180))):
            Circle(SKETCH20_R)
        with Locations(Location((-46.25, -5.517879978, 0), (0, 0, 180))):
            Circle(SKETCH20_R_2, mode=Mode.SUBTRACT)
    # profile 2 of 2: a face of its own
    with BuildSketch(Plane(origin=(32.5, 0, 0), x_dir=(0, 0, -1), z_dir=(1, 0, 0))):
        with Locations((-78.75, -5.517879978)):
            Circle(SKETCH20_R)
        with Locations((-78.75, -5.517879978)):
            Circle(SKETCH20_R_2, mode=Mode.SUBTRACT)
    extrude(amount=-BOSS_EXTRUDE8_DEPTH)

    # Sketch21 → Cut-Extrude11 (cut)
    with BuildSketch(Plane.ZY.offset(-27.5)):
        with Locations((46.25, -5.517879978)):
            Circle(SKETCH21_R)
    extrude(amount=-CUT_EXTRUDE11_DEPTH, mode=Mode.SUBTRACT)

    # Sketch23 → Cut-Extrude13 (cut)
    with BuildSketch(Plane.ZY.offset(-27.5)):
        with Locations(Location((78.75, -5.517879978, 0), (0, 0, 180))):
            Circle(SKETCH23_R)
    extrude(amount=-CUT_EXTRUDE13_DEPTH, mode=Mode.SUBTRACT)

    # Sketch24 → Cut-Extrude14 (cut)
    with BuildSketch(Plane(origin=(-29.5, 0, 0), x_dir=(0, 0, -1), z_dir=(1, 0, 0))):
        with Locations(Location((-46.25, -5.517879978, 0), (0, 0, 180))):
            Circle(SKETCH24_R)
    extrude(amount=-CUT_EXTRUDE14_DEPTH, mode=Mode.SUBTRACT)

    # Sketch25 → Boss-Extrude9 (add)
    with BuildSketch(Plane.ZY.offset(32.5)):
        with Locations((78.75, -5.51787995)):
            Circle(SKETCH25_R)
        with Locations(Location((78.75, -5.51787995, 0), (0, 0, 180.000000718))):
            Circle(SKETCH25_R_2, mode=Mode.SUBTRACT)
    extrude(amount=-BOSS_EXTRUDE9_DEPTH)

    # Sketch26 → Cut-Extrude15 (cut)
    with BuildSketch(Plane(origin=(-27.5, 0, 0), x_dir=(0, 0, -1), z_dir=(1, 0, 0))):
        with Locations(Location((-78.75, -5.51787995, 0), (0, 0, 359.999999282))):
            Circle(SKETCH26_R)
    extrude(amount=-CUT_EXTRUDE15_DEPTH, mode=Mode.SUBTRACT)


solid = body_2.part
